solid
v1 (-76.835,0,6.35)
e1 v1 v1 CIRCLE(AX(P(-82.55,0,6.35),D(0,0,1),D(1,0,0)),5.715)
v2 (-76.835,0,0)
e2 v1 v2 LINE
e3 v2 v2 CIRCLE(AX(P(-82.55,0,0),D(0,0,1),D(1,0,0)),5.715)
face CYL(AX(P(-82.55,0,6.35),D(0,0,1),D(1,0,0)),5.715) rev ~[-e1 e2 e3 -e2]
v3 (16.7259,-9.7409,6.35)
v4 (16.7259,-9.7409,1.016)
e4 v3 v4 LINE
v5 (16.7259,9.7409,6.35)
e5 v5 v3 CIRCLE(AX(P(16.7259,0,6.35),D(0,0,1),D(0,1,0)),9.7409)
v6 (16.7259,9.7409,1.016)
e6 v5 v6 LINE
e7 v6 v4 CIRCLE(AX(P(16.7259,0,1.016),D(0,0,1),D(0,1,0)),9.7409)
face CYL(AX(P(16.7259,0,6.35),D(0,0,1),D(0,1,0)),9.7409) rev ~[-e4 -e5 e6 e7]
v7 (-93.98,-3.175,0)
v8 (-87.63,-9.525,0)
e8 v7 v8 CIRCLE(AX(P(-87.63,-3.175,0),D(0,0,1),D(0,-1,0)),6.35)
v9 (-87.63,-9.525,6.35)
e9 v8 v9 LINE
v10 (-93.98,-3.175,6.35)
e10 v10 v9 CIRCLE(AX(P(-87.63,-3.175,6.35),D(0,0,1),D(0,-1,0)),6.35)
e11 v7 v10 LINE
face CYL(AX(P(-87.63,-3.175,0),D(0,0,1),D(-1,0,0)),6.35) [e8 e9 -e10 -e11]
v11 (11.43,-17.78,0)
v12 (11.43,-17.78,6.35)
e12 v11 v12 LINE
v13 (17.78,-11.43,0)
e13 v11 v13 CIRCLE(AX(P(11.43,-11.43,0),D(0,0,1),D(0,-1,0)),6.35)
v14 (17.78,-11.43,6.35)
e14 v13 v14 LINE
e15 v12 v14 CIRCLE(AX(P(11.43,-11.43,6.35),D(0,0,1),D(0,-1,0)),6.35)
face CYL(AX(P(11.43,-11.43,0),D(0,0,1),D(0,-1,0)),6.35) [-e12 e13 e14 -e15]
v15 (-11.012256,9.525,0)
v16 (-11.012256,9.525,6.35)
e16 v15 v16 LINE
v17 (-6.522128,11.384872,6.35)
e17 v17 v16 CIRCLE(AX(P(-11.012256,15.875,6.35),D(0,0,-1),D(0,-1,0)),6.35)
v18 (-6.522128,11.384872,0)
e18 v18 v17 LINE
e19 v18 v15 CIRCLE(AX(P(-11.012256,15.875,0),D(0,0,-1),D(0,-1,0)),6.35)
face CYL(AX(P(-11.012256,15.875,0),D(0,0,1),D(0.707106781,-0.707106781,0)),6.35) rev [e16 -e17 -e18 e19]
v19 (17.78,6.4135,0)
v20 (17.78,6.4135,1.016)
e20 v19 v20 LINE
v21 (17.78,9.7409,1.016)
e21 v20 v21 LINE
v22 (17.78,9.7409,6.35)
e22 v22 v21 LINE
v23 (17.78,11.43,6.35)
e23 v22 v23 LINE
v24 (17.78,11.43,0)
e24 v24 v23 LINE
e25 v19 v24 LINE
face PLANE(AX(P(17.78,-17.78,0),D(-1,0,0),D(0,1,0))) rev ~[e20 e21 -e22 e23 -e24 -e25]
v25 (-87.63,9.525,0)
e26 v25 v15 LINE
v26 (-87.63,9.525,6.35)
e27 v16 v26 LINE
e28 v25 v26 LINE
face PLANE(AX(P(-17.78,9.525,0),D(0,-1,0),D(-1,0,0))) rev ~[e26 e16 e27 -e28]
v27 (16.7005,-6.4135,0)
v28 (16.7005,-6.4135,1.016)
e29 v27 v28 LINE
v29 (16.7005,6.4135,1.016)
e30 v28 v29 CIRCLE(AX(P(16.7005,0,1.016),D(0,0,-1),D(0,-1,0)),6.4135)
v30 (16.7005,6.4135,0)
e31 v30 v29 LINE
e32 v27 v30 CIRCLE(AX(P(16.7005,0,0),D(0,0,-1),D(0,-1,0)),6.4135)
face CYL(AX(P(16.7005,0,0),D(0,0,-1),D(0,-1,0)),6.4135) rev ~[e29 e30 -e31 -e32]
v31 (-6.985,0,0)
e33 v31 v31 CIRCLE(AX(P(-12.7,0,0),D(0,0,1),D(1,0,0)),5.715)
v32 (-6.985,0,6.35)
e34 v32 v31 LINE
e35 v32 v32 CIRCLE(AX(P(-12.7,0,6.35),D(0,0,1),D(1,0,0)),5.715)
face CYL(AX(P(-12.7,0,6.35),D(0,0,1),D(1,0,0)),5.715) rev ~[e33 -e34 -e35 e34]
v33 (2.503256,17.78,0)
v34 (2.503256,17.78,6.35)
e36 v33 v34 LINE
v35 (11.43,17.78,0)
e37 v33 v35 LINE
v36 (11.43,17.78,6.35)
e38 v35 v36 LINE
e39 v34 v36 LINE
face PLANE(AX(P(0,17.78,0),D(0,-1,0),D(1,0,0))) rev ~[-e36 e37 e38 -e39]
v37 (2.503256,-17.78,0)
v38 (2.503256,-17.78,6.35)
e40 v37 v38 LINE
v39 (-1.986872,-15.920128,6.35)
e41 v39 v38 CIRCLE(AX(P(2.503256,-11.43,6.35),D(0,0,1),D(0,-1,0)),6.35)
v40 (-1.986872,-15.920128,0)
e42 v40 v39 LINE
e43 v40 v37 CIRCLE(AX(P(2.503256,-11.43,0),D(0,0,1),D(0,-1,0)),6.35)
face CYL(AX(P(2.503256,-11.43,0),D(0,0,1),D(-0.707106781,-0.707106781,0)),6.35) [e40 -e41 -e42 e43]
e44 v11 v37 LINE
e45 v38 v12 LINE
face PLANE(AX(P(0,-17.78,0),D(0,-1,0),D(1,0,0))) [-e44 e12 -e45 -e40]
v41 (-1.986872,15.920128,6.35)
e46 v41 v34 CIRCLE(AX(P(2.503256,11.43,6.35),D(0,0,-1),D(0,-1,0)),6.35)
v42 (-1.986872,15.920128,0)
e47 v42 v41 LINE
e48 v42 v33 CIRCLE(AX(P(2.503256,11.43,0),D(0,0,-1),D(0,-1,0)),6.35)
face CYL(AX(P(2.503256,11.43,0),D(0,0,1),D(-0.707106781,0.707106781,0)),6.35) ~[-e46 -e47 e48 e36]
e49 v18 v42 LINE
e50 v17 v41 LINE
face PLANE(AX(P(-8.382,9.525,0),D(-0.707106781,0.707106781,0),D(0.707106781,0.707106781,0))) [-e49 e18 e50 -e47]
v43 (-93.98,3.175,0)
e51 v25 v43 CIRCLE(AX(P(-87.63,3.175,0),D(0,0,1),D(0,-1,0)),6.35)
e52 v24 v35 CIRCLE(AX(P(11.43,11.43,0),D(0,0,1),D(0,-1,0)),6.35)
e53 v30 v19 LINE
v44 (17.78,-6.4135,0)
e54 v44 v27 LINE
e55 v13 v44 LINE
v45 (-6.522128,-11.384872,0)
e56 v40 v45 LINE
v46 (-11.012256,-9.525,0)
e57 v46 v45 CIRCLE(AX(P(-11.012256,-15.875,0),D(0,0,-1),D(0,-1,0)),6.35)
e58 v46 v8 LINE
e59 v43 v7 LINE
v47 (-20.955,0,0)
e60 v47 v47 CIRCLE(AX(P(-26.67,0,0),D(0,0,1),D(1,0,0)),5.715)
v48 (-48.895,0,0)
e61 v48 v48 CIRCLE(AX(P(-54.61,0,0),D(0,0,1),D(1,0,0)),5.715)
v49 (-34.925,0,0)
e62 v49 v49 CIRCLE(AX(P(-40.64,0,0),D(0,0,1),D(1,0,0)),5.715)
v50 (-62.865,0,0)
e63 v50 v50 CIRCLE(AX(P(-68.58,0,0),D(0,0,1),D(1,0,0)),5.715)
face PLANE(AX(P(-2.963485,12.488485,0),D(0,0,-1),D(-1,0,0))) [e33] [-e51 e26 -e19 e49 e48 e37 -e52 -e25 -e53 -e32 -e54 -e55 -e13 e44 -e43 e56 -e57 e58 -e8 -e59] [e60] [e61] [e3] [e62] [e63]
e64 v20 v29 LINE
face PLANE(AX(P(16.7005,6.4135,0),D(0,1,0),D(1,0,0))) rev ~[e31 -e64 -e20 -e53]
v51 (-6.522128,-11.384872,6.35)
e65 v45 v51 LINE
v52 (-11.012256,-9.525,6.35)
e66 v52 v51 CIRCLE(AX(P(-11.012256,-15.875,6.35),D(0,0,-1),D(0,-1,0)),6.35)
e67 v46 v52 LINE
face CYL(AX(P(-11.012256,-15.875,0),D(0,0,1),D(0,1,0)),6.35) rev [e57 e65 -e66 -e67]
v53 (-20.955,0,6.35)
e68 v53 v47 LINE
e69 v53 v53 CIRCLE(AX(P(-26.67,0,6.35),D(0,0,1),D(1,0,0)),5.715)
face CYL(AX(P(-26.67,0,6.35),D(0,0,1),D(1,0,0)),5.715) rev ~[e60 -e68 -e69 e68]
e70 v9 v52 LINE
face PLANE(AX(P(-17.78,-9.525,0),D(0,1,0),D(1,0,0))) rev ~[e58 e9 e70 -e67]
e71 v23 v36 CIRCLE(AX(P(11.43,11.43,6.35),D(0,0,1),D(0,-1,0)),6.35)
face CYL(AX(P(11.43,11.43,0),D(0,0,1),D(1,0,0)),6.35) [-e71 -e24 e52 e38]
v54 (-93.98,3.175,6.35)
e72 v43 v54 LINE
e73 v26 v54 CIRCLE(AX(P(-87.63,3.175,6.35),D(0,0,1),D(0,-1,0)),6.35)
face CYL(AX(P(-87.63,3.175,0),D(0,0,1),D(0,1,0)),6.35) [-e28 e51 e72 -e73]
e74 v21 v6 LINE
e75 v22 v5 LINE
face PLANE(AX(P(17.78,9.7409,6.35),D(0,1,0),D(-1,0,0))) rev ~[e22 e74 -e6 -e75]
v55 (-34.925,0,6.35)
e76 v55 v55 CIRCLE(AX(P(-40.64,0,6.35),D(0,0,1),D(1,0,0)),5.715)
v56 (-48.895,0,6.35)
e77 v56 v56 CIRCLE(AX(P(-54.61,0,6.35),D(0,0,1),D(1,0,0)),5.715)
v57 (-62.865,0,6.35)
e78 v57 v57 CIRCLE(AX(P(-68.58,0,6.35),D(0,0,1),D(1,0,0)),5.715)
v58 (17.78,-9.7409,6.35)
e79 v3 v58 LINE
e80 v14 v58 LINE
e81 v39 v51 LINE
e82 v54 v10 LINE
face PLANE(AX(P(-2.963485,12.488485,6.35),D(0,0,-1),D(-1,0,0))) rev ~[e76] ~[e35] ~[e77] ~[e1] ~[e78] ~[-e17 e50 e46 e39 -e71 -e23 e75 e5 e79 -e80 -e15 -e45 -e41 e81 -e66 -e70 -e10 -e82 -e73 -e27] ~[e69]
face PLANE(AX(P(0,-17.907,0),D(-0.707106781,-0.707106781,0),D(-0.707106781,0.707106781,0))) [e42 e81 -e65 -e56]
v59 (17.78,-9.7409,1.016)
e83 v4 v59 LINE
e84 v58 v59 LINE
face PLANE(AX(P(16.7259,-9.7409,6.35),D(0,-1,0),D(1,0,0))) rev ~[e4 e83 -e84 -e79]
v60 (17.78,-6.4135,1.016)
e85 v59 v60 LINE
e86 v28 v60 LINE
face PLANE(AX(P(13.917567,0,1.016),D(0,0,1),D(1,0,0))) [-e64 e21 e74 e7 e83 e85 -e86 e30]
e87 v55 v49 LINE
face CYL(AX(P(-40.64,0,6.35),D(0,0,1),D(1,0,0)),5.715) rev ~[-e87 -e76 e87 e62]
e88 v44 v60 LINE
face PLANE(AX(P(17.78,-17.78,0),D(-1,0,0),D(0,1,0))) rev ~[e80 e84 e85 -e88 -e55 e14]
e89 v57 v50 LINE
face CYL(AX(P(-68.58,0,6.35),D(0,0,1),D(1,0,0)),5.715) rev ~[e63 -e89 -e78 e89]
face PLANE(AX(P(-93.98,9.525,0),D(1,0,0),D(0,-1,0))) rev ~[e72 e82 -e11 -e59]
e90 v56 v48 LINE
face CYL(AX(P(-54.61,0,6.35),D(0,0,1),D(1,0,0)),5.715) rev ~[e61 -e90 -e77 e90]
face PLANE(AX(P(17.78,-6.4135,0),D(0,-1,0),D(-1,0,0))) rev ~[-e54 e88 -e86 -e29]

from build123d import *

# Parameters (mm, degrees)
F1_DEPTH    = 6.35
F3_DEPTH    = 5.334
F4_W        = 17.78
F4_H        = 8.255
F5_DEPTH    = 25.4
F6_R        = 5.715
F7_DEPTH    = 25.4
F8_T4_DEPTH = 6.35
F8_T9_DEPTH = 6.35
F9_R        = 6.35


# Not quite as in the source:
# - a fillet or chamfer that OpenCascade refuses, or shapes differently, is made with other operations: its cross-section is extruded or revolved along the edge and cut away or added


with BuildPart() as f1:
    # F0 (on Top) → F1 (new body)
    with BuildSketch(Plane.XY):
        Polygon((8.1444730278, -17.78), (17.78, -17.78), (17.78, 17.78), (-17.78, 17.78), (-17.78, 9.525), (-93.98, 9.525), (-93.98, -9.525), (-17.78, -9.525), (-17.78, -17.78), (-8.1444730278, -17.78), align=None)
    extrude(amount=F1_DEPTH)

    # F2 (on face) → F3 (cut)
    with BuildSketch(Plane.XY.offset(6.35)):
        with BuildLine():
            Line((17.78, 9.7409), (16.7259, 9.7409))
            ThreePointArc((16.7259, 9.7409), (6.985, 0), (16.7259, -9.7409))
            Line((16.7259, -9.7409), (17.78, -9.7409))
            Line((17.78, -9.7409), (17.78, 9.7409))
        make_face()
    extrude(amount=-F3_DEPTH, mode=Mode.SUBTRACT)

    # F4 (on face) → F5 (cut)
    with BuildSketch(Plane(origin=(0, 0, 0), x_dir=(1, 0, 0), z_dir=(0, 0, -1))):
        with BuildLine():
            Line((17.78, 6.4135), (16.7005, 6.4135))
            ThreePointArc((16.7005, 6.4135), (10.287, 0), (16.7005, -6.4135))
            Line((16.7005, -6.4135), (17.78, -6.4135))
            Line((17.78, -6.4135), (17.78, 6.4135))
        make_face()
        with Locations((-8.89, -13.6525)):
            Rectangle(F4_W, F4_H)
        with Locations((-8.89, 13.6525)):
            Rectangle(F4_W, F4_H)
    extrude(amount=-F5_DEPTH, mode=Mode.SUBTRACT)

    # F6 (on face) → F7 (cut)
    with BuildSketch(Plane.XY.offset(6.35)):
        with Locations((-82.55, 0)):
            Circle(F6_R)
        with Locations((-68.58, 0)):
            Circle(F6_R)
        with Locations((-54.61, 0)):
            Circle(F6_R)
        with Locations((-40.64, 0)):
            Circle(F6_R)
        with Locations((-26.67, 0)):
            Circle(F6_R)
        with Locations((-12.7, 0)):
            Circle(F6_R)
    extrude(amount=-F7_DEPTH, mode=Mode.SUBTRACT)

    # F8: chamfer of 8.382 on 2 edges, made by hand


with BuildPart() as f8_tool2:
    # F8_s3 → F8_t4 (new body)
    with BuildSketch(Plane.XY):
        Polygon((0, -17.907), (-8.382, -9.525), (0, -9.525), align=None)
    extrude(amount=F8_T4_DEPTH)

    split(bisect_by=Plane.XZ.offset(17.78), keep=Keep.BOTTOM)


with BuildPart() as f1_1:
    add(f1.part)

    # F8_t1: union F8_tool2
    add(f8_tool2.part)


with BuildPart() as f8_tool7:
    # F8_s8 → F8_t9 (new body)
    with BuildSketch(Plane.XY):
        Polygon((-8.382, 9.525), (0, 17.907), (0, 9.525), align=None)
    extrude(amount=F8_T9_DEPTH)

    split(bisect_by=Plane.XZ.offset(-17.78), keep=Keep.TOP)


with BuildPart() as f1_2:
    add(f1_1.part)

    # F8_t6: union F8_tool7
    add(f8_tool7.part)

    # F9
    f9_edges = [f1_2.edges().sort_by_distance(p)[0] for p in [
        (-8.382, -9.525, 3.175),
        (-8.382, 9.525, 3.175),
        (-0.127, 17.78, 3.175),
        (-0.127, -17.78, 3.175),
        (-93.98, 9.525, 3.175),
        (-93.98, -9.525, 3.175),
        (17.78, 17.78, 3.175),
        (17.78, -17.78, 3.175),
    ]]
    fillet(f9_edges, radius=F9_R)


solid = f1_2.part
